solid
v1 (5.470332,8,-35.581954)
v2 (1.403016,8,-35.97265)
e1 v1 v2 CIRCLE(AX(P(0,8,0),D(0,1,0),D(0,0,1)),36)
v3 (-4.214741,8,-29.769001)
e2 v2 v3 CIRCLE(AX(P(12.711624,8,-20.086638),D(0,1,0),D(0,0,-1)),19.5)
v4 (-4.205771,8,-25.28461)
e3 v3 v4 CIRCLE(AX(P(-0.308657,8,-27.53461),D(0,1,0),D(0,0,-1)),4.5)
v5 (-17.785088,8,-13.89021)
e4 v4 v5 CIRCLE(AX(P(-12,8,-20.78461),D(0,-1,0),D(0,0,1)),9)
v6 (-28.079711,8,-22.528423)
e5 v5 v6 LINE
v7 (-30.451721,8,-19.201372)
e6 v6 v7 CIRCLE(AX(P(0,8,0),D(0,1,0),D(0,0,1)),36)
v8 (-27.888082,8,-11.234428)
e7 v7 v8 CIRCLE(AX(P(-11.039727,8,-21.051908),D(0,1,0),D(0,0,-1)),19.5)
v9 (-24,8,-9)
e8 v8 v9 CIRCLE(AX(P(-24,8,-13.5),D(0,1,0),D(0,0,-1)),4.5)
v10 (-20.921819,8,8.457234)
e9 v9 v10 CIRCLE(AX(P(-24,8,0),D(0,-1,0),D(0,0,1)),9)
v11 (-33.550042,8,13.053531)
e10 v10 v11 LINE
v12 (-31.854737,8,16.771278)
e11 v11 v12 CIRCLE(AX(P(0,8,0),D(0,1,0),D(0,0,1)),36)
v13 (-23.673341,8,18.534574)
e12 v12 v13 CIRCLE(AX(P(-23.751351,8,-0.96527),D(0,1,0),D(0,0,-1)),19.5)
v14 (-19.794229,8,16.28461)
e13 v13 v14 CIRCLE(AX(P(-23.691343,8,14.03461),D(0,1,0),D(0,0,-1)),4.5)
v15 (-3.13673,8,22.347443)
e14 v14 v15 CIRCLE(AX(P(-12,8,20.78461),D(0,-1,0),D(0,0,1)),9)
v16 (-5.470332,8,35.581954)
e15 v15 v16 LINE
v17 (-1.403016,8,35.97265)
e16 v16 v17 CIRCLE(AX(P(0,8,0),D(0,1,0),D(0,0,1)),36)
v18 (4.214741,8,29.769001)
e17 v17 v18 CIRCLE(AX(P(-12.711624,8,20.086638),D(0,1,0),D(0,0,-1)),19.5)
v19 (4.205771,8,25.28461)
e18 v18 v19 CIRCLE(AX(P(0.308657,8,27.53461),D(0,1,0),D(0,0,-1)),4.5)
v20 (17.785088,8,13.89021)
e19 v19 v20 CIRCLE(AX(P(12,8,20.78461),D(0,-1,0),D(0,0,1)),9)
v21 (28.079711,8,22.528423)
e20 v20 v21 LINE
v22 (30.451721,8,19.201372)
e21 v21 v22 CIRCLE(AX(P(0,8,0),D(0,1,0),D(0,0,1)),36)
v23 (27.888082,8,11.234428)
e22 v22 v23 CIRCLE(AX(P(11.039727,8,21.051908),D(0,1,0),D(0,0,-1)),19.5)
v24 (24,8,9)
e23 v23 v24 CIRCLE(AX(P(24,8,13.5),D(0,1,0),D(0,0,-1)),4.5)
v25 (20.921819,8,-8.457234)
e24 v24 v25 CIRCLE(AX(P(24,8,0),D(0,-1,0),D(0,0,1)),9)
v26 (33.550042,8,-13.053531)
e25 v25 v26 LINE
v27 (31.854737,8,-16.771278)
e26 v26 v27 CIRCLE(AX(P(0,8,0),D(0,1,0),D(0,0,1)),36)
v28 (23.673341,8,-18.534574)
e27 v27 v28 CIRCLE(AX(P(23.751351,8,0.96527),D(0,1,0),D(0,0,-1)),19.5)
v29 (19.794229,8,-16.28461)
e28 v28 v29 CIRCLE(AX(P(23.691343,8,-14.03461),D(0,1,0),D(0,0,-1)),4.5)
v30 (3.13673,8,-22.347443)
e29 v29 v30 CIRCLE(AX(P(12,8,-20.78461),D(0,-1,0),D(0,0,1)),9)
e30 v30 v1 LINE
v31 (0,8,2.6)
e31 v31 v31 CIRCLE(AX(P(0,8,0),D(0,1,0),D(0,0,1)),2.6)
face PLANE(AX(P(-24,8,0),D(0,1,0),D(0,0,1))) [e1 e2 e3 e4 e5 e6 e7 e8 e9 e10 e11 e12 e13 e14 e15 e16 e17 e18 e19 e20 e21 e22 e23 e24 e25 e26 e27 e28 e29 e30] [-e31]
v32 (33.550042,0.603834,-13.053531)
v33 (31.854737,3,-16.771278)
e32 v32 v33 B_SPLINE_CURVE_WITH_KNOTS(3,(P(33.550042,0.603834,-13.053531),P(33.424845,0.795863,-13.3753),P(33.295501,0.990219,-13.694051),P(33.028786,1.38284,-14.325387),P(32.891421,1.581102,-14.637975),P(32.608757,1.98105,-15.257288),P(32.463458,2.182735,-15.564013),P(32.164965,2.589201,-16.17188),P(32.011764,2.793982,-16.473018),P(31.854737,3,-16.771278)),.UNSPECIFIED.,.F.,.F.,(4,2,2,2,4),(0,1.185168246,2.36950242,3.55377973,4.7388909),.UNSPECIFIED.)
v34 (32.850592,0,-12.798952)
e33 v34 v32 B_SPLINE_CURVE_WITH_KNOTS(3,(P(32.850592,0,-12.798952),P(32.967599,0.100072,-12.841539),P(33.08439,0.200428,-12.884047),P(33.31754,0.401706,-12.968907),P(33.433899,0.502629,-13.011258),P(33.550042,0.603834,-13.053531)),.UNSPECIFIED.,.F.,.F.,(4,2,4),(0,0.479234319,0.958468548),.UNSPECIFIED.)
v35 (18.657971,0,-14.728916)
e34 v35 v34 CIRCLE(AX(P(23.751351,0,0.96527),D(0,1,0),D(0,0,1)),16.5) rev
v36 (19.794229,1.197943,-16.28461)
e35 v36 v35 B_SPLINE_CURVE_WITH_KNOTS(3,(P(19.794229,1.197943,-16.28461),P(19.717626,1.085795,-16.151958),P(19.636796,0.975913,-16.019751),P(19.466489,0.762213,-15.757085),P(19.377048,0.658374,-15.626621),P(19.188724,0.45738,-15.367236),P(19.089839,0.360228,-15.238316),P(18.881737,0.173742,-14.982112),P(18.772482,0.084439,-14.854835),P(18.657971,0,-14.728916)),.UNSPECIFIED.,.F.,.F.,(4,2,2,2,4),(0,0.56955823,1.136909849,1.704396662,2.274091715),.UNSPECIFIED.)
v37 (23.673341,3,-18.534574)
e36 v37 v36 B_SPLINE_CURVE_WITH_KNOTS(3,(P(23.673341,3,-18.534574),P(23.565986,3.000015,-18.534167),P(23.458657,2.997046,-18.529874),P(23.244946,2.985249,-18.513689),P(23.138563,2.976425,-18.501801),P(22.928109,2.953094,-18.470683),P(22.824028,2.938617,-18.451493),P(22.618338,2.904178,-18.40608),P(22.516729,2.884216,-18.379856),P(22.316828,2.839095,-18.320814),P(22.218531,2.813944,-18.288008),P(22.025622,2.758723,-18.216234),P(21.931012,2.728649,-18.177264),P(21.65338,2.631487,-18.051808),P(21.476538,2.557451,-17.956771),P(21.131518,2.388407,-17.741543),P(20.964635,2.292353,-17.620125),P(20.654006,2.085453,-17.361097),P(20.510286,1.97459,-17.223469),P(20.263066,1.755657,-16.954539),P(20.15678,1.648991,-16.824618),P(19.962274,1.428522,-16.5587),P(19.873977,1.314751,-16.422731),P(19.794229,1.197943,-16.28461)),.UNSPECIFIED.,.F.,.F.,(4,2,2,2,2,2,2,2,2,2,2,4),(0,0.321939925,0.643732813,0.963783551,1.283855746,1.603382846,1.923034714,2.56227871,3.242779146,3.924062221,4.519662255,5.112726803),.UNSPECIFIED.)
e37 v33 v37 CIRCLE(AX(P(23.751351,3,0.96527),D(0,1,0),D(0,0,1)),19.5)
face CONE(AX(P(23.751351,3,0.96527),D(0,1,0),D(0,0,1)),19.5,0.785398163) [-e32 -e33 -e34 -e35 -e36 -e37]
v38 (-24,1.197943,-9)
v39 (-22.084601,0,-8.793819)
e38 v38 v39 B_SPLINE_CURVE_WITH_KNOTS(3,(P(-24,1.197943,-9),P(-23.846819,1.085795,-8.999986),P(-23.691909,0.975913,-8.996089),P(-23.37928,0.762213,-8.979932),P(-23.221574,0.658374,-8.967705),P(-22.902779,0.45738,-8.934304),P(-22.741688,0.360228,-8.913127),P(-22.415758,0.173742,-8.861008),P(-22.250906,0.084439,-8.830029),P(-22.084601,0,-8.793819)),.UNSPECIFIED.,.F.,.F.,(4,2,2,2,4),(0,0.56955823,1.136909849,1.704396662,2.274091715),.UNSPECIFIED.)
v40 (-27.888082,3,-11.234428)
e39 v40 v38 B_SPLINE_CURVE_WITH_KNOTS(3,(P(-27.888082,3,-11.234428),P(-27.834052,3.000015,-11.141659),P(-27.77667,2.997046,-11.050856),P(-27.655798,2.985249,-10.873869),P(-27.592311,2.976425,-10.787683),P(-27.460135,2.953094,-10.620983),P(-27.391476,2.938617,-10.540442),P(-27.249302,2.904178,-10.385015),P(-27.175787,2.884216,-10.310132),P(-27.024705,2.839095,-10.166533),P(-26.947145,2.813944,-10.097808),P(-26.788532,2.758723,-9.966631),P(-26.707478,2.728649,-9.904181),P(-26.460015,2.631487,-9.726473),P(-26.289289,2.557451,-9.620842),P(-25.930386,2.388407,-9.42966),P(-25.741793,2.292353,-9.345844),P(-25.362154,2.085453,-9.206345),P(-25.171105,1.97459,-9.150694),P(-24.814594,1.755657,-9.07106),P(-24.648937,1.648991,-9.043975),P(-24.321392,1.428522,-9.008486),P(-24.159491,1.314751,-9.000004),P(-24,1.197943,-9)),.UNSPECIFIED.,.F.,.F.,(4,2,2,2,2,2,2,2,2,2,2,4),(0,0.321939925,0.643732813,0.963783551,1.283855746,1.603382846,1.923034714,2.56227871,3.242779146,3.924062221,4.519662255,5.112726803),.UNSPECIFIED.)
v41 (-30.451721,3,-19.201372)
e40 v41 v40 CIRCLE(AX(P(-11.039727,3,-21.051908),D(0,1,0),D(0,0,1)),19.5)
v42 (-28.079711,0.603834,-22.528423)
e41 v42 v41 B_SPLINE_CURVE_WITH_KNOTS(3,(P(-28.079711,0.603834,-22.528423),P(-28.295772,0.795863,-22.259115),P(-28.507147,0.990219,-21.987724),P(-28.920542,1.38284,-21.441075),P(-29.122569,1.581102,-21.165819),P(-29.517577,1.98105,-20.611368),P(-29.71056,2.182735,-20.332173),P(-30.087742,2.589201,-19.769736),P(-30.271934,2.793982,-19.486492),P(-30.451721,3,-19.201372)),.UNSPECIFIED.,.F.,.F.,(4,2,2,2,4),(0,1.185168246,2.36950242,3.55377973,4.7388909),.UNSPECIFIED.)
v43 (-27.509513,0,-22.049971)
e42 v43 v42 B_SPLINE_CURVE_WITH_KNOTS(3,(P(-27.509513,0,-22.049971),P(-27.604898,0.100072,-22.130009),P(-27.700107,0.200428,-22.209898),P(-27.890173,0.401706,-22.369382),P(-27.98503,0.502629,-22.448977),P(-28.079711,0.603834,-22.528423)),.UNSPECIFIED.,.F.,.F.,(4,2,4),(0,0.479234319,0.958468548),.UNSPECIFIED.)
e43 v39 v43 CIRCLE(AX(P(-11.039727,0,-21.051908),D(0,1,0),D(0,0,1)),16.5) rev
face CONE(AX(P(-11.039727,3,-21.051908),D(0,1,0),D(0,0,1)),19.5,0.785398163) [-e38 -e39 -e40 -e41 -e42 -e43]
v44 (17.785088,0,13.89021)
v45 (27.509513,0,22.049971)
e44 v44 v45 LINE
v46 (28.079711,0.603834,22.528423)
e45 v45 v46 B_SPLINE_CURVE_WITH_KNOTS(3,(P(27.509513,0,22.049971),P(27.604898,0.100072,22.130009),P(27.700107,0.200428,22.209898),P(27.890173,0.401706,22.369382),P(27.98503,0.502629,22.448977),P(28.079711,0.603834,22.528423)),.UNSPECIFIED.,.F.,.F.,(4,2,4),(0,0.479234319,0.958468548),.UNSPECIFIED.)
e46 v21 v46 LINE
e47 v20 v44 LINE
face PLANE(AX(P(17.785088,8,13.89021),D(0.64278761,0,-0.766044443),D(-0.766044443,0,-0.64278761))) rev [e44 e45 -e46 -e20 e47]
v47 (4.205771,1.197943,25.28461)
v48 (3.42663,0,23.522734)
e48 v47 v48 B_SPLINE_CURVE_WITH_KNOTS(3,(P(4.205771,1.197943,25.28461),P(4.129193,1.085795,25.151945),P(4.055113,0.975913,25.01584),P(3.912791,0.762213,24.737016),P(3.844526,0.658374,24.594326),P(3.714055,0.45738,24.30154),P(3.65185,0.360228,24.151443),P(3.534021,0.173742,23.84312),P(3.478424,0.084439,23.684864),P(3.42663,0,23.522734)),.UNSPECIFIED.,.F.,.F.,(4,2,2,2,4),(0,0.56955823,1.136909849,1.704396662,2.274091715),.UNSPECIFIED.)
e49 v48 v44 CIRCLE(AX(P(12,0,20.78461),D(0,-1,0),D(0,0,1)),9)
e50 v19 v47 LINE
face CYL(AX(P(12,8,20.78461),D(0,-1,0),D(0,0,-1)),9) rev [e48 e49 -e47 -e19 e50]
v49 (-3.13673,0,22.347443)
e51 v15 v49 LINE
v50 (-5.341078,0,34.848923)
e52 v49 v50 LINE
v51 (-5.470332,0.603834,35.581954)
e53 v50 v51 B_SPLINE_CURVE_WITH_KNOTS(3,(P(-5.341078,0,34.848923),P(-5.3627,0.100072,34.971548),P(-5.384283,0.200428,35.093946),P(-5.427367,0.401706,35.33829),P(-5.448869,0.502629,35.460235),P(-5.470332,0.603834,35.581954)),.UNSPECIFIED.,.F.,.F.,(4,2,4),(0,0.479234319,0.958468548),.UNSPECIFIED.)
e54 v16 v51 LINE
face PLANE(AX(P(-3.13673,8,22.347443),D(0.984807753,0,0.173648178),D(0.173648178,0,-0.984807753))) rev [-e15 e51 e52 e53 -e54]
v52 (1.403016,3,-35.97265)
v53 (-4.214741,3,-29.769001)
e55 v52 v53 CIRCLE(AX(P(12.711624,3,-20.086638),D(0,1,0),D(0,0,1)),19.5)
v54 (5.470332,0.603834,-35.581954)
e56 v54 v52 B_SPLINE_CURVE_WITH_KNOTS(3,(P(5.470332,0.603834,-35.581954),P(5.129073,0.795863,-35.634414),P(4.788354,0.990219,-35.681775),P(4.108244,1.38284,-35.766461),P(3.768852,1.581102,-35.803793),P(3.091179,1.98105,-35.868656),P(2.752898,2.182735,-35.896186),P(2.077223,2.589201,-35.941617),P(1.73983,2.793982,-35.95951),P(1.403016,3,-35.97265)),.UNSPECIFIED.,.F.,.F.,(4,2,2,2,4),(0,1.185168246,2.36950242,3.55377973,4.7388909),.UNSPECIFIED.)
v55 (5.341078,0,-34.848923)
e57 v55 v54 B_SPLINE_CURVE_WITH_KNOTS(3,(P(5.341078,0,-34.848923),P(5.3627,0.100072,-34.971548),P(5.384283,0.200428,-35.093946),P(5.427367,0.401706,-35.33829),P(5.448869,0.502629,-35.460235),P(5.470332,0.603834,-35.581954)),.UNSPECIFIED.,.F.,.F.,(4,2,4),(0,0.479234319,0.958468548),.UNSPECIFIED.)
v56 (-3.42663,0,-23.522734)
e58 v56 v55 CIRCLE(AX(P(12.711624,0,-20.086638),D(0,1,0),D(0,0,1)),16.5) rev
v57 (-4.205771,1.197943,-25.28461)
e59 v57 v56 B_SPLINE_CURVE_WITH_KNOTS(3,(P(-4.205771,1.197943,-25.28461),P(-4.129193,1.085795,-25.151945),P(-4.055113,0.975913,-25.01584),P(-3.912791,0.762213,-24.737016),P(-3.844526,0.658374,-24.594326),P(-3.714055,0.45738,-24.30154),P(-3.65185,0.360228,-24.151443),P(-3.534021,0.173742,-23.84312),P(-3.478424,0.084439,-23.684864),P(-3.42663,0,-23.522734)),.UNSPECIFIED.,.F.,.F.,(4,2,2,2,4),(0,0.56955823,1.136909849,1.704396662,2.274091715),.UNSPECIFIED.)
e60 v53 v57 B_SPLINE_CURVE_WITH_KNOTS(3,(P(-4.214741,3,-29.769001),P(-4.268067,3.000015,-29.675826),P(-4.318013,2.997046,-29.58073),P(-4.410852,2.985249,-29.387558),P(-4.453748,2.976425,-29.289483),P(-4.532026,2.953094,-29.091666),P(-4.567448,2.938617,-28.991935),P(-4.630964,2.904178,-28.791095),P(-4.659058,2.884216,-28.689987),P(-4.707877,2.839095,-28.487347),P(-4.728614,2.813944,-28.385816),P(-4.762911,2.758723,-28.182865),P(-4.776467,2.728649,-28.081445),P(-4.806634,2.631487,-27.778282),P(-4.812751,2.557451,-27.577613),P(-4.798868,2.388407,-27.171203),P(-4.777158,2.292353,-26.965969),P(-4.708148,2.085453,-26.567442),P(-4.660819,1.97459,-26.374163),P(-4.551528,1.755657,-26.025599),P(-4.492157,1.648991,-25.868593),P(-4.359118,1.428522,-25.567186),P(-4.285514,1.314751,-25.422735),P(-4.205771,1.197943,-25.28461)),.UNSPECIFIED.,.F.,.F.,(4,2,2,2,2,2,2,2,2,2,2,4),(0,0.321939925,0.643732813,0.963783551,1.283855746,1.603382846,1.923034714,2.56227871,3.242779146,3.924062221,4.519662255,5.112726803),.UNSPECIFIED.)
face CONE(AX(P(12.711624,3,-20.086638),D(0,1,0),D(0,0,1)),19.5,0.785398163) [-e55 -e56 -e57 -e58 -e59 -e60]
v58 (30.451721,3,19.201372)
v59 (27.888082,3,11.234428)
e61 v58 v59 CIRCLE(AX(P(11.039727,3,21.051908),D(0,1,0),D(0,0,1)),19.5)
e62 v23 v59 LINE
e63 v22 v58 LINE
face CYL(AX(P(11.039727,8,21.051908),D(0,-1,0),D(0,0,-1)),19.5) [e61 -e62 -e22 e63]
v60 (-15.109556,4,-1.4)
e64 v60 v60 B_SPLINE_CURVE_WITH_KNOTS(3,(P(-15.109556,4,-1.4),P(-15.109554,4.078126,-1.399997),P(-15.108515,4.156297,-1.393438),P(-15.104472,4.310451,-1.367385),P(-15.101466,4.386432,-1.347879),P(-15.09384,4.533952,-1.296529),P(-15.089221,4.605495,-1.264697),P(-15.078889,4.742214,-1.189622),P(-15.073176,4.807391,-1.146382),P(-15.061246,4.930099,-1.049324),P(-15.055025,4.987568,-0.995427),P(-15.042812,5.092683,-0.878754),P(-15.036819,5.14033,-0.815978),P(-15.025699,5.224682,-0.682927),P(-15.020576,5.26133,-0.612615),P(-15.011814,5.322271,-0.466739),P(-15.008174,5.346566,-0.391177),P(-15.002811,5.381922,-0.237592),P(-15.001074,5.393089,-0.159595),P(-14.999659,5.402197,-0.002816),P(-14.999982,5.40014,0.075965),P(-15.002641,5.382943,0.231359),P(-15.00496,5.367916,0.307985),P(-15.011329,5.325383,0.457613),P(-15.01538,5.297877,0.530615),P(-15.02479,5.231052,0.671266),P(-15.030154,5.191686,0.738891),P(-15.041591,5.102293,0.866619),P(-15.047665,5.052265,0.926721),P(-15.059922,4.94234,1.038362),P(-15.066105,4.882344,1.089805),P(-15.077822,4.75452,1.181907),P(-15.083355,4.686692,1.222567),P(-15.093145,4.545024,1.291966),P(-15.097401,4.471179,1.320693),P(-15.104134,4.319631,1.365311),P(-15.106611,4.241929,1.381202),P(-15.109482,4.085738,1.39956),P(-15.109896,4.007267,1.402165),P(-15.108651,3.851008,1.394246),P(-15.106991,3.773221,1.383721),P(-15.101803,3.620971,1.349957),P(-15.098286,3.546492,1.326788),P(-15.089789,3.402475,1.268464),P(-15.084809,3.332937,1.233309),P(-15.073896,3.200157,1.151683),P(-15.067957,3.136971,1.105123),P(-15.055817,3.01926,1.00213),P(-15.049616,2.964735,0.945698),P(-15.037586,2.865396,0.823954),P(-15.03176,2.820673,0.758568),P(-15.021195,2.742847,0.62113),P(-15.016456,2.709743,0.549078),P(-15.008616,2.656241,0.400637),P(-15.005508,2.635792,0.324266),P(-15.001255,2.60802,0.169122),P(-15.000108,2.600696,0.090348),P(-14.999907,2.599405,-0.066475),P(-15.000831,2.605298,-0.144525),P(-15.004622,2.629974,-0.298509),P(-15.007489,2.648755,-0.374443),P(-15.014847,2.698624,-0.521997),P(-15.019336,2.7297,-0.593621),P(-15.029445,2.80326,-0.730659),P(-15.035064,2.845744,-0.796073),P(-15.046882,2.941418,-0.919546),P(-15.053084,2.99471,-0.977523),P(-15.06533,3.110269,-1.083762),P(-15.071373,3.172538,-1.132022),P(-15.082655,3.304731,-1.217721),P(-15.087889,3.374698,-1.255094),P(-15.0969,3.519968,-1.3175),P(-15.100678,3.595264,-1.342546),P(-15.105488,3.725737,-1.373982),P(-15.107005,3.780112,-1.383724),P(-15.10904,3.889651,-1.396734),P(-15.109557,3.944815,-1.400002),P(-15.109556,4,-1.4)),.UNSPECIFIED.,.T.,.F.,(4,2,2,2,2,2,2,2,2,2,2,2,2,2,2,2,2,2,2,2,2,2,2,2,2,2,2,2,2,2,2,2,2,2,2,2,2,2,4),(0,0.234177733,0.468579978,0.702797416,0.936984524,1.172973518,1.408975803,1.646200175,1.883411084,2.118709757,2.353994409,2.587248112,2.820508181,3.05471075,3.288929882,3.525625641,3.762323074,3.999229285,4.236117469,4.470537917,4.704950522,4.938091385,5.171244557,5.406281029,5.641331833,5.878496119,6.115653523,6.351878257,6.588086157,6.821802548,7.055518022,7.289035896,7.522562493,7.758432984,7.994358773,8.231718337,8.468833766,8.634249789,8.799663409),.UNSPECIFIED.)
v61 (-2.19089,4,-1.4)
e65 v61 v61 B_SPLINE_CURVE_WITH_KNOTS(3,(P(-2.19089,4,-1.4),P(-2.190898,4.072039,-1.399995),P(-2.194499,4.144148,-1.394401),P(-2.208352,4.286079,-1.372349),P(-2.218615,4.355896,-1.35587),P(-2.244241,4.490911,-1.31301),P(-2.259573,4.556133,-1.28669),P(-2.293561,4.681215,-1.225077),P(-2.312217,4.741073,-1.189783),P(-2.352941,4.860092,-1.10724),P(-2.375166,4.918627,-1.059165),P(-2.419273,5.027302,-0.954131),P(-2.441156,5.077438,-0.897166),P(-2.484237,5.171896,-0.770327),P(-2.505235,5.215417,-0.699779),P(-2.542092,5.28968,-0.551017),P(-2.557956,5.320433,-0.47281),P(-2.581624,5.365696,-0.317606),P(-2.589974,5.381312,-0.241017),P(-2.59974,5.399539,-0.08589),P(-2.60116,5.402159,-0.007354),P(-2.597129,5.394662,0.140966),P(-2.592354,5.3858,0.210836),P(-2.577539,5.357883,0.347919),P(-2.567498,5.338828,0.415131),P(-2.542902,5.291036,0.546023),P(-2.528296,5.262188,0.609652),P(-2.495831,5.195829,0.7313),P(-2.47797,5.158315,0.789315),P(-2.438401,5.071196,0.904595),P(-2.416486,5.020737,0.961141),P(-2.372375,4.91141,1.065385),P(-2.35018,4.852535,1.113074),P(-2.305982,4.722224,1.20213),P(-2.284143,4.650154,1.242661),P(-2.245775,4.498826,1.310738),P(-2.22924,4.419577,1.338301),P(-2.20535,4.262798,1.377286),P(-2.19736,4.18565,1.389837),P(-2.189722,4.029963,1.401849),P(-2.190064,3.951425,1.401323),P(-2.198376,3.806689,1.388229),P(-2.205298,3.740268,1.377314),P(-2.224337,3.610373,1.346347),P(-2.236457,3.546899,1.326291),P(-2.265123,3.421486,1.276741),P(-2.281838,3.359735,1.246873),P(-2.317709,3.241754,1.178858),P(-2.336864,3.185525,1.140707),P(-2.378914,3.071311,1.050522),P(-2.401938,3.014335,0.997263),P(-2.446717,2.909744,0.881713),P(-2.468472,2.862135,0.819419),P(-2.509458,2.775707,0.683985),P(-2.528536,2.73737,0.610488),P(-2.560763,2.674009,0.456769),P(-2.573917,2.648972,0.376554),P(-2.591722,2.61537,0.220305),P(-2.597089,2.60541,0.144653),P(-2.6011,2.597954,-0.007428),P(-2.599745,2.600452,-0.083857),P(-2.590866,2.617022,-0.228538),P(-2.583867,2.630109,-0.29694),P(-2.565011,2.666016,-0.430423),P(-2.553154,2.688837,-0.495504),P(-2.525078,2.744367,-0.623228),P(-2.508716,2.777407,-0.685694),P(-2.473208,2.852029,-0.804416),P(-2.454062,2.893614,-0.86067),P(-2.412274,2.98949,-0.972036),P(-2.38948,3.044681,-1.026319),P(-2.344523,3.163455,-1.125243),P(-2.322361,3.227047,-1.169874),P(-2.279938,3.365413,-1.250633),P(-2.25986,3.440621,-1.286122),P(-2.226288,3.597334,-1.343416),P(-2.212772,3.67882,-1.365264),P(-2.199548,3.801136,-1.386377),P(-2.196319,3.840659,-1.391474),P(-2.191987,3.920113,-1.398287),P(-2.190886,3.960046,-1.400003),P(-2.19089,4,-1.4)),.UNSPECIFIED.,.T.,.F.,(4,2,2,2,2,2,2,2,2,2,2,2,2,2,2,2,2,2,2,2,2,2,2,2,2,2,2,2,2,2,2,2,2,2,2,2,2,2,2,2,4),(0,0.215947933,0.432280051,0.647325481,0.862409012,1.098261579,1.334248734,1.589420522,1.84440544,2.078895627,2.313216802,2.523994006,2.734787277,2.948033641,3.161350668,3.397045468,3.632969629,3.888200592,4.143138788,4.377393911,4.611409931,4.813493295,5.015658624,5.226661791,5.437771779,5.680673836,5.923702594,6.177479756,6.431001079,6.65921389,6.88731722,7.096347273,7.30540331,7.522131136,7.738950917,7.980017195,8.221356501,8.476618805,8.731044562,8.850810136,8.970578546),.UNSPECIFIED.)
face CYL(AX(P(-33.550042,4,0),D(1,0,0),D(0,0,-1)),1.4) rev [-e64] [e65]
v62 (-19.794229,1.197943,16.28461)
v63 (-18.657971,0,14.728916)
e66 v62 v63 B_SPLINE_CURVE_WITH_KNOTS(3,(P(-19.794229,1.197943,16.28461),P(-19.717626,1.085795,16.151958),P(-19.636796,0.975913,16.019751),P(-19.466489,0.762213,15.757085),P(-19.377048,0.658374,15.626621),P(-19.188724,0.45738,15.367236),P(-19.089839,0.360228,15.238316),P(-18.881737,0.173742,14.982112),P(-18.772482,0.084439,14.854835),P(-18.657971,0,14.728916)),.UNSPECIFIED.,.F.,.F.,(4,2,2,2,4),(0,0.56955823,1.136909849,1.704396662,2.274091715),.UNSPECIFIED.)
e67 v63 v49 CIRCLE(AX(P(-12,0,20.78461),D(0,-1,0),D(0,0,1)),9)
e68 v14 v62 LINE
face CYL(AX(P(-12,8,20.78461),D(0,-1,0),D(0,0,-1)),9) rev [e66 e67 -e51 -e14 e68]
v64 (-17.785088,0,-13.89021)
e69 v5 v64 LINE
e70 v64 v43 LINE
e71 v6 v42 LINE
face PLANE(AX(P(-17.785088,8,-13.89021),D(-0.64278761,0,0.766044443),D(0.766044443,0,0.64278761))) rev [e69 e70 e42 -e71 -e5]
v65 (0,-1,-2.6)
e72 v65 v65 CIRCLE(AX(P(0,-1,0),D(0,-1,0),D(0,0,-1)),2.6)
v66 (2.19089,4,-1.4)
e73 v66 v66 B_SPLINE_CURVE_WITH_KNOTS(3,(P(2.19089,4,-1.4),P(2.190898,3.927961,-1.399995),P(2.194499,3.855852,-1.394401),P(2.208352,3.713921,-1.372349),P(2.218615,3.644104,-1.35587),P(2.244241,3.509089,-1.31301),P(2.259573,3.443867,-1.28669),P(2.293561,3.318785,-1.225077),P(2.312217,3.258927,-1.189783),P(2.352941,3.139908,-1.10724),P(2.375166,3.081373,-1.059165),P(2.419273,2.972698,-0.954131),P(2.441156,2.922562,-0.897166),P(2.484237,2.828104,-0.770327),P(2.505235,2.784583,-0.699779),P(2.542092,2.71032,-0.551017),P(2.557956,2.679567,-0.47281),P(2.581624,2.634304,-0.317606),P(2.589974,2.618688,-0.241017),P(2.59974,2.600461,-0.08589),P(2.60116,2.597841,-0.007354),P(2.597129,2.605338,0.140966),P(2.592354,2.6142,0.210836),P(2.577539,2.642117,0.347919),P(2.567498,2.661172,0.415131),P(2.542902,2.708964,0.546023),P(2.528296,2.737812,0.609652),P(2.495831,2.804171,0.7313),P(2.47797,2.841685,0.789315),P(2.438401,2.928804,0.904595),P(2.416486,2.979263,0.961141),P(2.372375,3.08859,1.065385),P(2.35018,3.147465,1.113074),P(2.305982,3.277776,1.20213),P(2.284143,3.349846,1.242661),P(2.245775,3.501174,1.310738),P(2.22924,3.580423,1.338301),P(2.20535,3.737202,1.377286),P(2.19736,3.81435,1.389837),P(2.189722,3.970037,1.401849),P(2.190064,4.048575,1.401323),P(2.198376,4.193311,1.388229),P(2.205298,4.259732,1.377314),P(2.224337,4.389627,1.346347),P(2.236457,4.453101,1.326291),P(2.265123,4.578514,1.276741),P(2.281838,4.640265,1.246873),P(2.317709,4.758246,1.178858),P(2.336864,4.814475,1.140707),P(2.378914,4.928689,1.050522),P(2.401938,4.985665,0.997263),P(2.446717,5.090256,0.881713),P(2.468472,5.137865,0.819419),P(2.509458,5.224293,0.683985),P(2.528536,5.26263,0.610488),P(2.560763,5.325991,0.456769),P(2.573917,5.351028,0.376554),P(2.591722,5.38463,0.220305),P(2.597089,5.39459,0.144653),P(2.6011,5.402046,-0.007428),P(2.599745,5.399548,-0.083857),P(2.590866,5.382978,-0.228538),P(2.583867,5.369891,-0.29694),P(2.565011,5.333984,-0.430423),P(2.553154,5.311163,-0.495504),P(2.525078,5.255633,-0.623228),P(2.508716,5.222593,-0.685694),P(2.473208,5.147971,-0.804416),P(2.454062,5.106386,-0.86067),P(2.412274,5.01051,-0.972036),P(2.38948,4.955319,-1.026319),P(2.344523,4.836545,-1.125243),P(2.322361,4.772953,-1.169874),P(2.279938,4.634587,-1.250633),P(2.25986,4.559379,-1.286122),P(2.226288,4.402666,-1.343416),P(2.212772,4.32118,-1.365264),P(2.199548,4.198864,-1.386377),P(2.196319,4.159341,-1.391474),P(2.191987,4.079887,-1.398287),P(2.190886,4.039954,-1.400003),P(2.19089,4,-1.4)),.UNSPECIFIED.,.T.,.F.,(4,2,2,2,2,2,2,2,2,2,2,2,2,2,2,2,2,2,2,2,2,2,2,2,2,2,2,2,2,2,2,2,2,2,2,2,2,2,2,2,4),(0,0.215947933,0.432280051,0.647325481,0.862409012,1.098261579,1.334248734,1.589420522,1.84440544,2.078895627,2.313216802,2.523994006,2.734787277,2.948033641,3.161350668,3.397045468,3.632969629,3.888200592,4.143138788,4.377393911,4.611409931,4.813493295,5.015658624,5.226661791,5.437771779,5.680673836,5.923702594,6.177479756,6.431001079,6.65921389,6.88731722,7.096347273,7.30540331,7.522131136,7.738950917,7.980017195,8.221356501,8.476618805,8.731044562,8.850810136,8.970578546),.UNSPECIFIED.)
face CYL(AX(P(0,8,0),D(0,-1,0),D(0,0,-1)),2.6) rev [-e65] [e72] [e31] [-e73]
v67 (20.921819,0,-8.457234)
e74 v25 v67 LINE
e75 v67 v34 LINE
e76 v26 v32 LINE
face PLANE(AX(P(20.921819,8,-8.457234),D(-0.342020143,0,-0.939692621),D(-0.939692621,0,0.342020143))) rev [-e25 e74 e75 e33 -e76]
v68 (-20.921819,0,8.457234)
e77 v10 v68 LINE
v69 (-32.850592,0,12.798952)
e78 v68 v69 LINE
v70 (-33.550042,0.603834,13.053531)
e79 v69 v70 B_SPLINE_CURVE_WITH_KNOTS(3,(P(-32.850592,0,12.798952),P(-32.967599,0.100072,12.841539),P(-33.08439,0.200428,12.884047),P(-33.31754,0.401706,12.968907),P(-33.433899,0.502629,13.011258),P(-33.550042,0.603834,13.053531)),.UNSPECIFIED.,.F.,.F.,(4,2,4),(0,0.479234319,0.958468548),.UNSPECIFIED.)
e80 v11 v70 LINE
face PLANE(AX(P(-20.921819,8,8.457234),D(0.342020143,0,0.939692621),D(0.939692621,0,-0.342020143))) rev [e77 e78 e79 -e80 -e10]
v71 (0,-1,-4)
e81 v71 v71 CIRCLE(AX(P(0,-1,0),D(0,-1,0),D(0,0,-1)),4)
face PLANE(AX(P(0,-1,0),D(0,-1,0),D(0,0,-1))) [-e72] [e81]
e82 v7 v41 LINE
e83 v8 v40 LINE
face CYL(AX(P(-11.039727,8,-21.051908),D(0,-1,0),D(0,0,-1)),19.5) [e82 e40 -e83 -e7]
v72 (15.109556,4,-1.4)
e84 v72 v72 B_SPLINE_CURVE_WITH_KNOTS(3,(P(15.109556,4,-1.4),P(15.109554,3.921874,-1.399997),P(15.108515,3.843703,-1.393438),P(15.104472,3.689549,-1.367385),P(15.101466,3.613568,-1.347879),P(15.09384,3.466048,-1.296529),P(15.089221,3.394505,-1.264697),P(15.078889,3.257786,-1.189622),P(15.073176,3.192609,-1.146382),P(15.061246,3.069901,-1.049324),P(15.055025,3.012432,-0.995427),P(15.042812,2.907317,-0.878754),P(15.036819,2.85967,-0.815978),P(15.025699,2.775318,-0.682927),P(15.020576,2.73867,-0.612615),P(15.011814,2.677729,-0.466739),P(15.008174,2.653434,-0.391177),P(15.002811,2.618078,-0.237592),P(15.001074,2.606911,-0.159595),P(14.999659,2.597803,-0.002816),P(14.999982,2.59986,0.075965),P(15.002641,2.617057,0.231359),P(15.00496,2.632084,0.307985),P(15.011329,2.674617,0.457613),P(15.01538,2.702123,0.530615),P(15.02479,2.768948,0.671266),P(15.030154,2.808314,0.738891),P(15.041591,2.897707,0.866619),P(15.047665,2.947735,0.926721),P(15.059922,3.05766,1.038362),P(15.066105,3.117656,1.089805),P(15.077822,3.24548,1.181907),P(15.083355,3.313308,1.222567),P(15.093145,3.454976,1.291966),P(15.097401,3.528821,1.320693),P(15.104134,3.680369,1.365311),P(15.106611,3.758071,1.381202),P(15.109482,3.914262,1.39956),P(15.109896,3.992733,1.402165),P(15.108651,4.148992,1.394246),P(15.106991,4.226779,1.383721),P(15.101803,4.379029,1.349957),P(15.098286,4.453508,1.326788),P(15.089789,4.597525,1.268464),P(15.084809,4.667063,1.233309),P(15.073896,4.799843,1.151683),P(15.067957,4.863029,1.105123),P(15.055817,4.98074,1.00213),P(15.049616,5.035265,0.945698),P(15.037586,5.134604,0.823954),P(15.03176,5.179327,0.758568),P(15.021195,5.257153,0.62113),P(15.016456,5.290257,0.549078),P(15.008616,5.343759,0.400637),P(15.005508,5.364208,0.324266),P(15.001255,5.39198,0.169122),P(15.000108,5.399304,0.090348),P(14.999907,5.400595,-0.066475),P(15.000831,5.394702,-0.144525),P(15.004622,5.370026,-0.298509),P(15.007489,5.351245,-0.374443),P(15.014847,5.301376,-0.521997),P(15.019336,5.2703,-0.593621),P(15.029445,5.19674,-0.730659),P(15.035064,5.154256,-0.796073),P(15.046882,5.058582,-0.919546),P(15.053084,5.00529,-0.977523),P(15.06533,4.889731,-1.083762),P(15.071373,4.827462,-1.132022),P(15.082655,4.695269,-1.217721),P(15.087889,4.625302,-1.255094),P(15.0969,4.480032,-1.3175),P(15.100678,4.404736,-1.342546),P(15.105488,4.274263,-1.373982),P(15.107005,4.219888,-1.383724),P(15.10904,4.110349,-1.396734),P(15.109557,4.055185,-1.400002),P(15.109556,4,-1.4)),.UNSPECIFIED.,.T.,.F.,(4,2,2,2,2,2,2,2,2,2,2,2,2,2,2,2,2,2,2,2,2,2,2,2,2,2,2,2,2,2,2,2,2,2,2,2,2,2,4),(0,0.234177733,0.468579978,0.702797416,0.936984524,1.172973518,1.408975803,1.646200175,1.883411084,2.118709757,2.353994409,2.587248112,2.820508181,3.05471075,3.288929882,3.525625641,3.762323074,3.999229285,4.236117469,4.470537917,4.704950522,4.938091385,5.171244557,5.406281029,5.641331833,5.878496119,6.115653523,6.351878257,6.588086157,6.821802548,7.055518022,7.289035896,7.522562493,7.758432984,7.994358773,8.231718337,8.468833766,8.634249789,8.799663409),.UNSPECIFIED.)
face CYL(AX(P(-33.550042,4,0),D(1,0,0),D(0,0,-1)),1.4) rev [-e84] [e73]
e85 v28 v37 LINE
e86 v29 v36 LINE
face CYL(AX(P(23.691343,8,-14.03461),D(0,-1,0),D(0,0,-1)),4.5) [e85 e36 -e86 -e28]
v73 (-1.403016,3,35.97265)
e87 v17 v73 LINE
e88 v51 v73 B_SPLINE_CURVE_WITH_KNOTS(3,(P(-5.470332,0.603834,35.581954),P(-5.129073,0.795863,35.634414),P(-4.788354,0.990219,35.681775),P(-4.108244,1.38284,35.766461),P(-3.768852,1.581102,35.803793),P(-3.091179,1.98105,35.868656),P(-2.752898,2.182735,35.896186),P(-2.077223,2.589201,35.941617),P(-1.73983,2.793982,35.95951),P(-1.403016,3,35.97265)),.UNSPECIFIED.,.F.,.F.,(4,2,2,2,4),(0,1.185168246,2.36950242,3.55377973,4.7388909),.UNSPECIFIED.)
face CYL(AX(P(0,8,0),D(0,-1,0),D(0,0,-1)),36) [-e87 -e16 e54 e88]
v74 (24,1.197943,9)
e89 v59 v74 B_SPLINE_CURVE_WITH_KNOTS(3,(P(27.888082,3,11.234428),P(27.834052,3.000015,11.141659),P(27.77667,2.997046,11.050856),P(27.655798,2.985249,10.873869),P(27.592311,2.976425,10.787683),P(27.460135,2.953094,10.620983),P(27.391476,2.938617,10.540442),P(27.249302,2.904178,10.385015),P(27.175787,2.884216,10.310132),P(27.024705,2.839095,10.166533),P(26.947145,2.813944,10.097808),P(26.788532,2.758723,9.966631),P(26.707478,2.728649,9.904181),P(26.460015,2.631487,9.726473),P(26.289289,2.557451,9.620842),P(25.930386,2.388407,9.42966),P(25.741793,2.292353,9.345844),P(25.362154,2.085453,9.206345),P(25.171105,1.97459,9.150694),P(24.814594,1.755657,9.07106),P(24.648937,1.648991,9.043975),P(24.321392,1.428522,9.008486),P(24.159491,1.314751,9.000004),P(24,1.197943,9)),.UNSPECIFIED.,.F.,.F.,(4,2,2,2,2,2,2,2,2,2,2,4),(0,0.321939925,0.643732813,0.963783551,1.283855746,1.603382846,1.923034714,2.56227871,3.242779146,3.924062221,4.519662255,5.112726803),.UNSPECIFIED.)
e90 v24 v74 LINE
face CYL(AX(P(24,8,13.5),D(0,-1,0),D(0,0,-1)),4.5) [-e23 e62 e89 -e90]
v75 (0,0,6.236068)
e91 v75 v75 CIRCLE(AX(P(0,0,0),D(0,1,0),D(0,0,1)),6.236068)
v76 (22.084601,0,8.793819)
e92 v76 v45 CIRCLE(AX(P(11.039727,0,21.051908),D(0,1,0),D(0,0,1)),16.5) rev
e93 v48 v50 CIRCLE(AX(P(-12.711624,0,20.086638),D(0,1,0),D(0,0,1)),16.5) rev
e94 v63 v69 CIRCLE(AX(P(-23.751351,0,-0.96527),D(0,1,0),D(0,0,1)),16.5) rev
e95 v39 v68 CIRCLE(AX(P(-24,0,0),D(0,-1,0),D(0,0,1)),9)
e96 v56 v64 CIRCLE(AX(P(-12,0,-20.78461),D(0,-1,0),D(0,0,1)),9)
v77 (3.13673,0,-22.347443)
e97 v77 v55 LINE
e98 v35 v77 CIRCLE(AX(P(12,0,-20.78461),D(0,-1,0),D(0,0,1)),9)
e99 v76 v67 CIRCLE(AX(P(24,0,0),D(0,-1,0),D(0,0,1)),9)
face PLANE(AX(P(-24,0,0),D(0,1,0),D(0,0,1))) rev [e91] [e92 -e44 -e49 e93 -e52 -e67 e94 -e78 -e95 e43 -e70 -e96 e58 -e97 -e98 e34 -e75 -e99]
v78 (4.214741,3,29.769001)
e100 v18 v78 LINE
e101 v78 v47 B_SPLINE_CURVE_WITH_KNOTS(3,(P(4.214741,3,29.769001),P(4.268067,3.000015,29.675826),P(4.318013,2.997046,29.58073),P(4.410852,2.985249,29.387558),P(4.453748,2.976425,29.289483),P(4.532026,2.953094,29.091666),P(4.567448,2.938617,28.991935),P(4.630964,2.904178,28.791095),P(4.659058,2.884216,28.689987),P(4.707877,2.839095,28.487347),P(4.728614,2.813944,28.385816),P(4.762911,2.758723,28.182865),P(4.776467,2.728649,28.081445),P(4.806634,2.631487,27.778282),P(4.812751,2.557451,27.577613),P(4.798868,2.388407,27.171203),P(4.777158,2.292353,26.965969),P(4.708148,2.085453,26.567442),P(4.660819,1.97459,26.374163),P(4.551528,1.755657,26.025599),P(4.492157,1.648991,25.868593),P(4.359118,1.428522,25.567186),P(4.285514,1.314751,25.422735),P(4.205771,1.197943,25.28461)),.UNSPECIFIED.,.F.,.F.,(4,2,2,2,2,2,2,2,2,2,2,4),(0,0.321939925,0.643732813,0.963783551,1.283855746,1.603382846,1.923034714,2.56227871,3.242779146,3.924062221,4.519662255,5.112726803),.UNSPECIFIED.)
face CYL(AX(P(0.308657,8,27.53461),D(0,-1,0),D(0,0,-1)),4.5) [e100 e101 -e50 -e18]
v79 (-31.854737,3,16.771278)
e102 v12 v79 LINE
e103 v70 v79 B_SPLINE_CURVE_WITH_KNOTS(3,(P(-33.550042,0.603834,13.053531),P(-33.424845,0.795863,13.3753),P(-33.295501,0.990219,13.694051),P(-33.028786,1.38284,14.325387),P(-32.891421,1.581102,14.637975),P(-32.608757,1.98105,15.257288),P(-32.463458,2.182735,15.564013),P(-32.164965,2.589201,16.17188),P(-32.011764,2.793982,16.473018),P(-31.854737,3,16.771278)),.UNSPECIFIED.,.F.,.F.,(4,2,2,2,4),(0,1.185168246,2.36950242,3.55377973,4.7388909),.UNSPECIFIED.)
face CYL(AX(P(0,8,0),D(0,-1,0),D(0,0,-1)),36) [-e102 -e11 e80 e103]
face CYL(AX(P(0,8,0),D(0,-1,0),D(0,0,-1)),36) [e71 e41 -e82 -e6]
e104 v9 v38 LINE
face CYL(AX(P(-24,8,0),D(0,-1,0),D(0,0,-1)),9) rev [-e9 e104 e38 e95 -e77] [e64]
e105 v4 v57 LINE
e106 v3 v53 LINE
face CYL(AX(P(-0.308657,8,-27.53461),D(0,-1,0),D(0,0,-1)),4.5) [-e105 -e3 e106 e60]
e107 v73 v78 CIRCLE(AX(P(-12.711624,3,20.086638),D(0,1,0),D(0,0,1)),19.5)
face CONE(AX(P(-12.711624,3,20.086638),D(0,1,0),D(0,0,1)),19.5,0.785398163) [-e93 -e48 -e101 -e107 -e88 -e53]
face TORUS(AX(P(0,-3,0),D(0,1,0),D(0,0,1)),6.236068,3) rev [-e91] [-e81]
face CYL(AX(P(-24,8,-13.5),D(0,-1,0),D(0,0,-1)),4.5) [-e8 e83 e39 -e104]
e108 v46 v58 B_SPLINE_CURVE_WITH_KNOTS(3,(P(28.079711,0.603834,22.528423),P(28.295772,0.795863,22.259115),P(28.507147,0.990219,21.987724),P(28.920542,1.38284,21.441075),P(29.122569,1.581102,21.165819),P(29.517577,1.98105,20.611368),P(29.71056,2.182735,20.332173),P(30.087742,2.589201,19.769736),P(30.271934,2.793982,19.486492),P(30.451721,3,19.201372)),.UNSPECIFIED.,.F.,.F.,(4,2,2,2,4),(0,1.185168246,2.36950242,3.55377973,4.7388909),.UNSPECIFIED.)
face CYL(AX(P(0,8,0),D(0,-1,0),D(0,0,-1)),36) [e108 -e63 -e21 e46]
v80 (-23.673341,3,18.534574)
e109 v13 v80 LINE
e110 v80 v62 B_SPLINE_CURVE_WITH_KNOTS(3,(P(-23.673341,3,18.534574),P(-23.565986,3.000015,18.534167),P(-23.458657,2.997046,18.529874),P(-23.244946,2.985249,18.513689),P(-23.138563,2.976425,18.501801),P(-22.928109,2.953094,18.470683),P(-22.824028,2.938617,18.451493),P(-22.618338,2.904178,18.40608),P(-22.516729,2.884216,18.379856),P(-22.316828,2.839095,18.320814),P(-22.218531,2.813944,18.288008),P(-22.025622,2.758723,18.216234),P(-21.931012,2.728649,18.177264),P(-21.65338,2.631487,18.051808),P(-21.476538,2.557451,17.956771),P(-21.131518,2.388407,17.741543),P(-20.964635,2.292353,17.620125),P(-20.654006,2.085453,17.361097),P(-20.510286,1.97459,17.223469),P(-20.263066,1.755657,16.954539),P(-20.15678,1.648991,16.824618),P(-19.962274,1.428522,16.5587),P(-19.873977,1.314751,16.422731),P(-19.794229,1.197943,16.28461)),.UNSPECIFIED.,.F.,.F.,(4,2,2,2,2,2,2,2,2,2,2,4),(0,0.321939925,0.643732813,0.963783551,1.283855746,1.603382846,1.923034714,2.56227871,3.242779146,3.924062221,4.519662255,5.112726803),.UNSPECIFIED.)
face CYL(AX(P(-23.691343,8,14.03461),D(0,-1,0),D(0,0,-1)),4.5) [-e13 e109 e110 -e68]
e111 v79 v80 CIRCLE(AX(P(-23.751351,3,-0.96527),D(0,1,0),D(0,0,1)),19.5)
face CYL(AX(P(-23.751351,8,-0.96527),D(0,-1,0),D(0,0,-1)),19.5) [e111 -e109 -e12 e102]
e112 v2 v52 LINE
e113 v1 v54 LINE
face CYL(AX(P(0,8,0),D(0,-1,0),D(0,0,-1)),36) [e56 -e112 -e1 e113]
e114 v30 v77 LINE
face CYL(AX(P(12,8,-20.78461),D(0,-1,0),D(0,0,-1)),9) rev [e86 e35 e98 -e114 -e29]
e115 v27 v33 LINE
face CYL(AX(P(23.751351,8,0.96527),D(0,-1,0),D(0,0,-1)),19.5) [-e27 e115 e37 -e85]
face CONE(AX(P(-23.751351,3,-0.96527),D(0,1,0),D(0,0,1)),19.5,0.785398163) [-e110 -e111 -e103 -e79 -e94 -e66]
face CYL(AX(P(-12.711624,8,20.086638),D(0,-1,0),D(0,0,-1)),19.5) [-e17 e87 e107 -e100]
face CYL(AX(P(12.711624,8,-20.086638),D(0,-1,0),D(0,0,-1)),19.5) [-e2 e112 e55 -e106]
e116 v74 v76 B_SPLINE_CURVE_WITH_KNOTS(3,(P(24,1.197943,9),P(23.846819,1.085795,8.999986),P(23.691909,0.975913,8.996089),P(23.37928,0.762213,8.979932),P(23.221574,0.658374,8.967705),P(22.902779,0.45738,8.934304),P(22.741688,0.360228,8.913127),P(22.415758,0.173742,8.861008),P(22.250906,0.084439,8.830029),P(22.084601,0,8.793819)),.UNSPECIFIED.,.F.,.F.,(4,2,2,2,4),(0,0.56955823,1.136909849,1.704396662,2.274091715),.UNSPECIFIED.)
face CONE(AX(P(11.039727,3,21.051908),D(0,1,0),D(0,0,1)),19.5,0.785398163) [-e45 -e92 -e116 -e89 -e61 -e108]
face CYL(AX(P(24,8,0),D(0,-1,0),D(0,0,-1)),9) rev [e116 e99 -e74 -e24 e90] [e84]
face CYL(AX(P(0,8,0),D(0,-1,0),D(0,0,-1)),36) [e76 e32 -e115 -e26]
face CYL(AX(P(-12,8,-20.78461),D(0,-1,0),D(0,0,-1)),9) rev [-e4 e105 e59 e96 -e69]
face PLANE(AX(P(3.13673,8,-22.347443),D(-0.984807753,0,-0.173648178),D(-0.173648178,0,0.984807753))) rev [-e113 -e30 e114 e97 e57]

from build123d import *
from build123d.topology import SkipClean

# Parameters (mm, degrees)
EXTRUDE_1_OUTLINE_R      = 2.6
EXTRUDE_1_DEPTH          = 8
CUT_EXTRUDE_1_DEPTH      = 50.836100116
CUT_EXTRUDE_1_DEPTH_BACK = 50.836100116
SKETCH_2_R               = 1.4
EXTRUDE_START            = 1
SKETCH_3_R               = 4
SKETCH_3_R_2             = 2.6
EXTRUDE_2_DEPTH          = 1
FILLET_1_R               = 3
CHAMFER_1_SIZE           = 3


# Read off the part's stored shape, not the designer's step: 凸台-拉伸1
with BuildPart() as part:
    # 凸台-拉伸1 outline → 凸台-拉伸1 (new body)
    with BuildSketch(Plane(origin=(0, 0, 0), x_dir=(1, 0, 0), z_dir=(0, 1, 0))):
        with BuildLine():
            ThreePointArc((-27.888081975, 11.234427543), (-26.242200252, 9.598392892), (-24, 9))
            ThreePointArc((-24, 9), (-15.136730223, 1.562833599), (-20.92181871, -8.457233587))
            Line((-20.92181871, -8.457233587), (-33.550042142, -13.053531028))
            ThreePointArc((-33.550042142, -13.053531028), (-32.755177906, -14.936476169), (-31.854736566, -16.771277779))
            ThreePointArc((-31.854736566, -16.771277779), (-27.859752737, -18.097023194), (-23.673340637, -18.534573681))
            ThreePointArc((-23.673340637, -18.534573681), (-21.433552206, -17.927215624), (-19.794228634, -16.284609691))
            ThreePointArc((-19.794228634, -16.284609691), (-8.92181871, -12.327376104), (-3.136730223, -22.34744329))
            Line((-3.136730223, -22.34744329), (-5.470331592, -35.581954307))
            ThreePointArc((-5.470331592, -35.581954307), (-3.442221148, -35.835054257), (-1.403015673, -35.972649986))
            ThreePointArc((-1.403015673, -35.972649986), (1.742605451, -33.17576521), (4.214741338, -29.769001224))
            ThreePointArc((4.214741338, -29.769001224), (4.808648047, -27.525608515), (4.205771366, -25.284609691))
            ThreePointArc((4.205771366, -25.284609691), (6.214911513, -13.890209703), (17.785088487, -13.890209703))
            Line((17.785088487, -13.890209703), (28.07971055, -22.528423279))
            ThreePointArc((28.07971055, -22.528423279), (29.312956758, -20.898578088), (30.451720893, -19.201372207))
            ThreePointArc((30.451720893, -19.201372207), (29.602358188, -15.078742016), (27.888081975, -11.234427543))
            ThreePointArc((27.888081975, -11.234427543), (26.242200252, -9.598392892), (24, -9))
            ThreePointArc((24, -9), (15.136730223, -1.562833599), (20.92181871, 8.457233587))
            Line((20.92181871, 8.457233587), (33.550042142, 13.053531028))
            ThreePointArc((33.550042142, 13.053531028), (32.755177906, 14.936476169), (31.854736566, 16.771277779))
            ThreePointArc((31.854736566, 16.771277779), (27.859752737, 18.097023194), (23.673340637, 18.534573681))
            ThreePointArc((23.673340637, 18.534573681), (21.433552206, 17.927215624), (19.794228634, 16.284609691))
            ThreePointArc((19.794228634, 16.284609691), (8.92181871, 12.327376104), (3.136730223, 22.34744329))
            Line((3.136730223, 22.34744329), (5.470331592, 35.581954307))
            ThreePointArc((5.470331592, 35.581954307), (3.442221148, 35.835054257), (1.403015673, 35.972649986))
            ThreePointArc((1.403015673, 35.972649986), (-1.742605451, 33.17576521), (-4.214741338, 29.769001224))
            ThreePointArc((-4.214741338, 29.769001224), (-4.808648047, 27.525608515), (-4.205771366, 25.284609691))
            ThreePointArc((-4.205771366, 25.284609691), (-6.214911513, 13.890209703), (-17.785088487, 13.890209703))
            Line((-17.785088487, 13.890209703), (-28.07971055, 22.528423279))
            ThreePointArc((-28.07971055, 22.528423279), (-29.312956758, 20.898578088), (-30.451720893, 19.201372207))
            ThreePointArc((-30.451720893, 19.201372207), (-29.602358188, 15.078742016), (-27.888081975, 11.234427543))
        make_face()
        Circle(EXTRUDE_1_OUTLINE_R, mode=Mode.SUBTRACT)
    extrude(amount=EXTRUDE_1_DEPTH)

    # 草图2 → 切除-拉伸1 (cut, two sides: drawn at the far end of the back side and taken through both)
    with BuildSketch(Plane(origin=(0, 0, 0), x_dir=(0, 0, -1), z_dir=(1, 0, 0)).offset(-CUT_EXTRUDE_1_DEPTH_BACK)):
        with Locations((0, 4)):
            Circle(SKETCH_2_R)
    extrude(amount=CUT_EXTRUDE_1_DEPTH + CUT_EXTRUDE_1_DEPTH_BACK, mode=Mode.SUBTRACT)

    # 草图3 → 凸台-拉伸2 (add)
    with SkipClean():  # the faces are left unmerged after this step: merging them gives an invalid solid
        with BuildSketch(Plane.XZ.offset(EXTRUDE_START)):
            with Locations(Location((0, 0, 0), (0, 0, 90))):
                Circle(SKETCH_3_R)
            with Locations(Location((0, 0, 0), (0, 0, 270))):
                Circle(SKETCH_3_R_2, mode=Mode.SUBTRACT)
        extrude(amount=-EXTRUDE_2_DEPTH)

    # 圆角1
    # the kernel refuses this fillet: 3 mm, written as the material it adds along each edge
    with BuildSketch(Plane(origin=(0, 0, 0), x_dir=(0, 0, 1), z_dir=(1, 0, 0))) as fillet_1_piece_1:
        with BuildLine():
            CenterArc((6.236067977, 3), FILLET_1_R, 221.810314896, 48.189685104)
            Line((4, 1), (3.95527864, 0.96))
            ThreePointArc((3.95527864, 0.96), (3.94, 0.5), (3.94, 0))
            Line((3.94, 0), (4, -0.06))
            Line((4, -0.06), (6.236067977, -0.06))
            Line((6.236067977, -0.06), (6.236067977, 0))
        make_face()
    revolve(axis=Axis((0, 0, 0), (0, -1, 0)))

    # 倒角1
    # the kernel refuses this chamfer: 3 mm, written as the material it takes off along each edge
    with BuildSketch(Plane(origin=(-23.751350664, 0, -0.965270296), x_dir=(-0.7340128901584542, 0, 0.6791355366060836), z_dir=(-0.6791355366060836, 0, -0.7340128901584542))) as chamfer_1_piece_1:
        Polygon((19.500000018 - CHAMFER_1_SIZE, 0), (19.500000018, CHAMFER_1_SIZE), (19.500000018, 0), align=None)
    revolve(axis=Axis((-23.751350664, 0, -0.965270296), (0, 1, 0)), revolution_arc=70.122480661, mode=Mode.SUBTRACT)
    with BuildSketch(Plane(origin=(-11.039726758, 0, -21.051908187), x_dir=(-0.9551550721197726, 0, -0.29610604216035863), z_dir=(0.29610604216035863, 0, -0.9551550721197726))) as chamfer_1_piece_2:
        Polygon((19.499999992 - CHAMFER_1_SIZE, 0), (19.499999992, CHAMFER_1_SIZE), (19.499999992, 0), align=None)
    revolve(axis=Axis((-11.039726758, 0, -21.051908187), (0, 1, 0)), revolution_arc=70.122480753, mode=Mode.SUBTRACT)
    with BuildSketch(Plane(origin=(12.711623912, 0, -20.086637915), x_dir=(-0.2211421814618006, 0, -0.9752415780606957), z_dir=(0.9752415780606957, 0, -0.2211421814618006))) as chamfer_1_piece_3:
        Polygon((19.499999996 - CHAMFER_1_SIZE, 0), (19.499999996, CHAMFER_1_SIZE), (19.499999996, 0), align=None)
    revolve(axis=Axis((12.711623912, 0, -20.086637915), (0, 1, 0)), revolution_arc=70.122480742, mode=Mode.SUBTRACT)
    with BuildSketch(Plane(origin=(23.751350664, 0, 0.965270296), x_dir=(0.7340128901584542, 0, -0.6791355366060836), z_dir=(0.6791355366060836, 0, 0.7340128901584542))) as chamfer_1_piece_4:
        Polygon((19.500000018 - CHAMFER_1_SIZE, 0), (19.500000018, CHAMFER_1_SIZE), (19.500000018, 0), align=None)
    revolve(axis=Axis((23.751350664, 0, 0.965270296), (0, 1, 0)), revolution_arc=70.122480661, mode=Mode.SUBTRACT)
    with BuildSketch(Plane(origin=(11.039726758, 0, 21.051908187), x_dir=(0.9551550721197726, 0, 0.29610604216035863), z_dir=(-0.29610604216035863, 0, 0.9551550721197726))) as chamfer_1_piece_5:
        Polygon((19.499999992 - CHAMFER_1_SIZE, 0), (19.499999992, CHAMFER_1_SIZE), (19.499999992, 0), align=None)
    revolve(axis=Axis((11.039726758, 0, 21.051908187), (0, 1, 0)), revolution_arc=70.122480753, mode=Mode.SUBTRACT)
    with BuildSketch(Plane(origin=(-12.711623912, 0, 20.086637915), x_dir=(0.2211421814618006, 0, 0.9752415780606957), z_dir=(-0.9752415780606957, 0, 0.2211421814618006))) as chamfer_1_piece_6:
        Polygon((19.499999996 - CHAMFER_1_SIZE, 0), (19.499999996, CHAMFER_1_SIZE), (19.499999996, 0), align=None)
    revolve(axis=Axis((-12.711623912, 0, 20.086637915), (0, 1, 0)), revolution_arc=70.122480742, mode=Mode.SUBTRACT)


solid = part.part
